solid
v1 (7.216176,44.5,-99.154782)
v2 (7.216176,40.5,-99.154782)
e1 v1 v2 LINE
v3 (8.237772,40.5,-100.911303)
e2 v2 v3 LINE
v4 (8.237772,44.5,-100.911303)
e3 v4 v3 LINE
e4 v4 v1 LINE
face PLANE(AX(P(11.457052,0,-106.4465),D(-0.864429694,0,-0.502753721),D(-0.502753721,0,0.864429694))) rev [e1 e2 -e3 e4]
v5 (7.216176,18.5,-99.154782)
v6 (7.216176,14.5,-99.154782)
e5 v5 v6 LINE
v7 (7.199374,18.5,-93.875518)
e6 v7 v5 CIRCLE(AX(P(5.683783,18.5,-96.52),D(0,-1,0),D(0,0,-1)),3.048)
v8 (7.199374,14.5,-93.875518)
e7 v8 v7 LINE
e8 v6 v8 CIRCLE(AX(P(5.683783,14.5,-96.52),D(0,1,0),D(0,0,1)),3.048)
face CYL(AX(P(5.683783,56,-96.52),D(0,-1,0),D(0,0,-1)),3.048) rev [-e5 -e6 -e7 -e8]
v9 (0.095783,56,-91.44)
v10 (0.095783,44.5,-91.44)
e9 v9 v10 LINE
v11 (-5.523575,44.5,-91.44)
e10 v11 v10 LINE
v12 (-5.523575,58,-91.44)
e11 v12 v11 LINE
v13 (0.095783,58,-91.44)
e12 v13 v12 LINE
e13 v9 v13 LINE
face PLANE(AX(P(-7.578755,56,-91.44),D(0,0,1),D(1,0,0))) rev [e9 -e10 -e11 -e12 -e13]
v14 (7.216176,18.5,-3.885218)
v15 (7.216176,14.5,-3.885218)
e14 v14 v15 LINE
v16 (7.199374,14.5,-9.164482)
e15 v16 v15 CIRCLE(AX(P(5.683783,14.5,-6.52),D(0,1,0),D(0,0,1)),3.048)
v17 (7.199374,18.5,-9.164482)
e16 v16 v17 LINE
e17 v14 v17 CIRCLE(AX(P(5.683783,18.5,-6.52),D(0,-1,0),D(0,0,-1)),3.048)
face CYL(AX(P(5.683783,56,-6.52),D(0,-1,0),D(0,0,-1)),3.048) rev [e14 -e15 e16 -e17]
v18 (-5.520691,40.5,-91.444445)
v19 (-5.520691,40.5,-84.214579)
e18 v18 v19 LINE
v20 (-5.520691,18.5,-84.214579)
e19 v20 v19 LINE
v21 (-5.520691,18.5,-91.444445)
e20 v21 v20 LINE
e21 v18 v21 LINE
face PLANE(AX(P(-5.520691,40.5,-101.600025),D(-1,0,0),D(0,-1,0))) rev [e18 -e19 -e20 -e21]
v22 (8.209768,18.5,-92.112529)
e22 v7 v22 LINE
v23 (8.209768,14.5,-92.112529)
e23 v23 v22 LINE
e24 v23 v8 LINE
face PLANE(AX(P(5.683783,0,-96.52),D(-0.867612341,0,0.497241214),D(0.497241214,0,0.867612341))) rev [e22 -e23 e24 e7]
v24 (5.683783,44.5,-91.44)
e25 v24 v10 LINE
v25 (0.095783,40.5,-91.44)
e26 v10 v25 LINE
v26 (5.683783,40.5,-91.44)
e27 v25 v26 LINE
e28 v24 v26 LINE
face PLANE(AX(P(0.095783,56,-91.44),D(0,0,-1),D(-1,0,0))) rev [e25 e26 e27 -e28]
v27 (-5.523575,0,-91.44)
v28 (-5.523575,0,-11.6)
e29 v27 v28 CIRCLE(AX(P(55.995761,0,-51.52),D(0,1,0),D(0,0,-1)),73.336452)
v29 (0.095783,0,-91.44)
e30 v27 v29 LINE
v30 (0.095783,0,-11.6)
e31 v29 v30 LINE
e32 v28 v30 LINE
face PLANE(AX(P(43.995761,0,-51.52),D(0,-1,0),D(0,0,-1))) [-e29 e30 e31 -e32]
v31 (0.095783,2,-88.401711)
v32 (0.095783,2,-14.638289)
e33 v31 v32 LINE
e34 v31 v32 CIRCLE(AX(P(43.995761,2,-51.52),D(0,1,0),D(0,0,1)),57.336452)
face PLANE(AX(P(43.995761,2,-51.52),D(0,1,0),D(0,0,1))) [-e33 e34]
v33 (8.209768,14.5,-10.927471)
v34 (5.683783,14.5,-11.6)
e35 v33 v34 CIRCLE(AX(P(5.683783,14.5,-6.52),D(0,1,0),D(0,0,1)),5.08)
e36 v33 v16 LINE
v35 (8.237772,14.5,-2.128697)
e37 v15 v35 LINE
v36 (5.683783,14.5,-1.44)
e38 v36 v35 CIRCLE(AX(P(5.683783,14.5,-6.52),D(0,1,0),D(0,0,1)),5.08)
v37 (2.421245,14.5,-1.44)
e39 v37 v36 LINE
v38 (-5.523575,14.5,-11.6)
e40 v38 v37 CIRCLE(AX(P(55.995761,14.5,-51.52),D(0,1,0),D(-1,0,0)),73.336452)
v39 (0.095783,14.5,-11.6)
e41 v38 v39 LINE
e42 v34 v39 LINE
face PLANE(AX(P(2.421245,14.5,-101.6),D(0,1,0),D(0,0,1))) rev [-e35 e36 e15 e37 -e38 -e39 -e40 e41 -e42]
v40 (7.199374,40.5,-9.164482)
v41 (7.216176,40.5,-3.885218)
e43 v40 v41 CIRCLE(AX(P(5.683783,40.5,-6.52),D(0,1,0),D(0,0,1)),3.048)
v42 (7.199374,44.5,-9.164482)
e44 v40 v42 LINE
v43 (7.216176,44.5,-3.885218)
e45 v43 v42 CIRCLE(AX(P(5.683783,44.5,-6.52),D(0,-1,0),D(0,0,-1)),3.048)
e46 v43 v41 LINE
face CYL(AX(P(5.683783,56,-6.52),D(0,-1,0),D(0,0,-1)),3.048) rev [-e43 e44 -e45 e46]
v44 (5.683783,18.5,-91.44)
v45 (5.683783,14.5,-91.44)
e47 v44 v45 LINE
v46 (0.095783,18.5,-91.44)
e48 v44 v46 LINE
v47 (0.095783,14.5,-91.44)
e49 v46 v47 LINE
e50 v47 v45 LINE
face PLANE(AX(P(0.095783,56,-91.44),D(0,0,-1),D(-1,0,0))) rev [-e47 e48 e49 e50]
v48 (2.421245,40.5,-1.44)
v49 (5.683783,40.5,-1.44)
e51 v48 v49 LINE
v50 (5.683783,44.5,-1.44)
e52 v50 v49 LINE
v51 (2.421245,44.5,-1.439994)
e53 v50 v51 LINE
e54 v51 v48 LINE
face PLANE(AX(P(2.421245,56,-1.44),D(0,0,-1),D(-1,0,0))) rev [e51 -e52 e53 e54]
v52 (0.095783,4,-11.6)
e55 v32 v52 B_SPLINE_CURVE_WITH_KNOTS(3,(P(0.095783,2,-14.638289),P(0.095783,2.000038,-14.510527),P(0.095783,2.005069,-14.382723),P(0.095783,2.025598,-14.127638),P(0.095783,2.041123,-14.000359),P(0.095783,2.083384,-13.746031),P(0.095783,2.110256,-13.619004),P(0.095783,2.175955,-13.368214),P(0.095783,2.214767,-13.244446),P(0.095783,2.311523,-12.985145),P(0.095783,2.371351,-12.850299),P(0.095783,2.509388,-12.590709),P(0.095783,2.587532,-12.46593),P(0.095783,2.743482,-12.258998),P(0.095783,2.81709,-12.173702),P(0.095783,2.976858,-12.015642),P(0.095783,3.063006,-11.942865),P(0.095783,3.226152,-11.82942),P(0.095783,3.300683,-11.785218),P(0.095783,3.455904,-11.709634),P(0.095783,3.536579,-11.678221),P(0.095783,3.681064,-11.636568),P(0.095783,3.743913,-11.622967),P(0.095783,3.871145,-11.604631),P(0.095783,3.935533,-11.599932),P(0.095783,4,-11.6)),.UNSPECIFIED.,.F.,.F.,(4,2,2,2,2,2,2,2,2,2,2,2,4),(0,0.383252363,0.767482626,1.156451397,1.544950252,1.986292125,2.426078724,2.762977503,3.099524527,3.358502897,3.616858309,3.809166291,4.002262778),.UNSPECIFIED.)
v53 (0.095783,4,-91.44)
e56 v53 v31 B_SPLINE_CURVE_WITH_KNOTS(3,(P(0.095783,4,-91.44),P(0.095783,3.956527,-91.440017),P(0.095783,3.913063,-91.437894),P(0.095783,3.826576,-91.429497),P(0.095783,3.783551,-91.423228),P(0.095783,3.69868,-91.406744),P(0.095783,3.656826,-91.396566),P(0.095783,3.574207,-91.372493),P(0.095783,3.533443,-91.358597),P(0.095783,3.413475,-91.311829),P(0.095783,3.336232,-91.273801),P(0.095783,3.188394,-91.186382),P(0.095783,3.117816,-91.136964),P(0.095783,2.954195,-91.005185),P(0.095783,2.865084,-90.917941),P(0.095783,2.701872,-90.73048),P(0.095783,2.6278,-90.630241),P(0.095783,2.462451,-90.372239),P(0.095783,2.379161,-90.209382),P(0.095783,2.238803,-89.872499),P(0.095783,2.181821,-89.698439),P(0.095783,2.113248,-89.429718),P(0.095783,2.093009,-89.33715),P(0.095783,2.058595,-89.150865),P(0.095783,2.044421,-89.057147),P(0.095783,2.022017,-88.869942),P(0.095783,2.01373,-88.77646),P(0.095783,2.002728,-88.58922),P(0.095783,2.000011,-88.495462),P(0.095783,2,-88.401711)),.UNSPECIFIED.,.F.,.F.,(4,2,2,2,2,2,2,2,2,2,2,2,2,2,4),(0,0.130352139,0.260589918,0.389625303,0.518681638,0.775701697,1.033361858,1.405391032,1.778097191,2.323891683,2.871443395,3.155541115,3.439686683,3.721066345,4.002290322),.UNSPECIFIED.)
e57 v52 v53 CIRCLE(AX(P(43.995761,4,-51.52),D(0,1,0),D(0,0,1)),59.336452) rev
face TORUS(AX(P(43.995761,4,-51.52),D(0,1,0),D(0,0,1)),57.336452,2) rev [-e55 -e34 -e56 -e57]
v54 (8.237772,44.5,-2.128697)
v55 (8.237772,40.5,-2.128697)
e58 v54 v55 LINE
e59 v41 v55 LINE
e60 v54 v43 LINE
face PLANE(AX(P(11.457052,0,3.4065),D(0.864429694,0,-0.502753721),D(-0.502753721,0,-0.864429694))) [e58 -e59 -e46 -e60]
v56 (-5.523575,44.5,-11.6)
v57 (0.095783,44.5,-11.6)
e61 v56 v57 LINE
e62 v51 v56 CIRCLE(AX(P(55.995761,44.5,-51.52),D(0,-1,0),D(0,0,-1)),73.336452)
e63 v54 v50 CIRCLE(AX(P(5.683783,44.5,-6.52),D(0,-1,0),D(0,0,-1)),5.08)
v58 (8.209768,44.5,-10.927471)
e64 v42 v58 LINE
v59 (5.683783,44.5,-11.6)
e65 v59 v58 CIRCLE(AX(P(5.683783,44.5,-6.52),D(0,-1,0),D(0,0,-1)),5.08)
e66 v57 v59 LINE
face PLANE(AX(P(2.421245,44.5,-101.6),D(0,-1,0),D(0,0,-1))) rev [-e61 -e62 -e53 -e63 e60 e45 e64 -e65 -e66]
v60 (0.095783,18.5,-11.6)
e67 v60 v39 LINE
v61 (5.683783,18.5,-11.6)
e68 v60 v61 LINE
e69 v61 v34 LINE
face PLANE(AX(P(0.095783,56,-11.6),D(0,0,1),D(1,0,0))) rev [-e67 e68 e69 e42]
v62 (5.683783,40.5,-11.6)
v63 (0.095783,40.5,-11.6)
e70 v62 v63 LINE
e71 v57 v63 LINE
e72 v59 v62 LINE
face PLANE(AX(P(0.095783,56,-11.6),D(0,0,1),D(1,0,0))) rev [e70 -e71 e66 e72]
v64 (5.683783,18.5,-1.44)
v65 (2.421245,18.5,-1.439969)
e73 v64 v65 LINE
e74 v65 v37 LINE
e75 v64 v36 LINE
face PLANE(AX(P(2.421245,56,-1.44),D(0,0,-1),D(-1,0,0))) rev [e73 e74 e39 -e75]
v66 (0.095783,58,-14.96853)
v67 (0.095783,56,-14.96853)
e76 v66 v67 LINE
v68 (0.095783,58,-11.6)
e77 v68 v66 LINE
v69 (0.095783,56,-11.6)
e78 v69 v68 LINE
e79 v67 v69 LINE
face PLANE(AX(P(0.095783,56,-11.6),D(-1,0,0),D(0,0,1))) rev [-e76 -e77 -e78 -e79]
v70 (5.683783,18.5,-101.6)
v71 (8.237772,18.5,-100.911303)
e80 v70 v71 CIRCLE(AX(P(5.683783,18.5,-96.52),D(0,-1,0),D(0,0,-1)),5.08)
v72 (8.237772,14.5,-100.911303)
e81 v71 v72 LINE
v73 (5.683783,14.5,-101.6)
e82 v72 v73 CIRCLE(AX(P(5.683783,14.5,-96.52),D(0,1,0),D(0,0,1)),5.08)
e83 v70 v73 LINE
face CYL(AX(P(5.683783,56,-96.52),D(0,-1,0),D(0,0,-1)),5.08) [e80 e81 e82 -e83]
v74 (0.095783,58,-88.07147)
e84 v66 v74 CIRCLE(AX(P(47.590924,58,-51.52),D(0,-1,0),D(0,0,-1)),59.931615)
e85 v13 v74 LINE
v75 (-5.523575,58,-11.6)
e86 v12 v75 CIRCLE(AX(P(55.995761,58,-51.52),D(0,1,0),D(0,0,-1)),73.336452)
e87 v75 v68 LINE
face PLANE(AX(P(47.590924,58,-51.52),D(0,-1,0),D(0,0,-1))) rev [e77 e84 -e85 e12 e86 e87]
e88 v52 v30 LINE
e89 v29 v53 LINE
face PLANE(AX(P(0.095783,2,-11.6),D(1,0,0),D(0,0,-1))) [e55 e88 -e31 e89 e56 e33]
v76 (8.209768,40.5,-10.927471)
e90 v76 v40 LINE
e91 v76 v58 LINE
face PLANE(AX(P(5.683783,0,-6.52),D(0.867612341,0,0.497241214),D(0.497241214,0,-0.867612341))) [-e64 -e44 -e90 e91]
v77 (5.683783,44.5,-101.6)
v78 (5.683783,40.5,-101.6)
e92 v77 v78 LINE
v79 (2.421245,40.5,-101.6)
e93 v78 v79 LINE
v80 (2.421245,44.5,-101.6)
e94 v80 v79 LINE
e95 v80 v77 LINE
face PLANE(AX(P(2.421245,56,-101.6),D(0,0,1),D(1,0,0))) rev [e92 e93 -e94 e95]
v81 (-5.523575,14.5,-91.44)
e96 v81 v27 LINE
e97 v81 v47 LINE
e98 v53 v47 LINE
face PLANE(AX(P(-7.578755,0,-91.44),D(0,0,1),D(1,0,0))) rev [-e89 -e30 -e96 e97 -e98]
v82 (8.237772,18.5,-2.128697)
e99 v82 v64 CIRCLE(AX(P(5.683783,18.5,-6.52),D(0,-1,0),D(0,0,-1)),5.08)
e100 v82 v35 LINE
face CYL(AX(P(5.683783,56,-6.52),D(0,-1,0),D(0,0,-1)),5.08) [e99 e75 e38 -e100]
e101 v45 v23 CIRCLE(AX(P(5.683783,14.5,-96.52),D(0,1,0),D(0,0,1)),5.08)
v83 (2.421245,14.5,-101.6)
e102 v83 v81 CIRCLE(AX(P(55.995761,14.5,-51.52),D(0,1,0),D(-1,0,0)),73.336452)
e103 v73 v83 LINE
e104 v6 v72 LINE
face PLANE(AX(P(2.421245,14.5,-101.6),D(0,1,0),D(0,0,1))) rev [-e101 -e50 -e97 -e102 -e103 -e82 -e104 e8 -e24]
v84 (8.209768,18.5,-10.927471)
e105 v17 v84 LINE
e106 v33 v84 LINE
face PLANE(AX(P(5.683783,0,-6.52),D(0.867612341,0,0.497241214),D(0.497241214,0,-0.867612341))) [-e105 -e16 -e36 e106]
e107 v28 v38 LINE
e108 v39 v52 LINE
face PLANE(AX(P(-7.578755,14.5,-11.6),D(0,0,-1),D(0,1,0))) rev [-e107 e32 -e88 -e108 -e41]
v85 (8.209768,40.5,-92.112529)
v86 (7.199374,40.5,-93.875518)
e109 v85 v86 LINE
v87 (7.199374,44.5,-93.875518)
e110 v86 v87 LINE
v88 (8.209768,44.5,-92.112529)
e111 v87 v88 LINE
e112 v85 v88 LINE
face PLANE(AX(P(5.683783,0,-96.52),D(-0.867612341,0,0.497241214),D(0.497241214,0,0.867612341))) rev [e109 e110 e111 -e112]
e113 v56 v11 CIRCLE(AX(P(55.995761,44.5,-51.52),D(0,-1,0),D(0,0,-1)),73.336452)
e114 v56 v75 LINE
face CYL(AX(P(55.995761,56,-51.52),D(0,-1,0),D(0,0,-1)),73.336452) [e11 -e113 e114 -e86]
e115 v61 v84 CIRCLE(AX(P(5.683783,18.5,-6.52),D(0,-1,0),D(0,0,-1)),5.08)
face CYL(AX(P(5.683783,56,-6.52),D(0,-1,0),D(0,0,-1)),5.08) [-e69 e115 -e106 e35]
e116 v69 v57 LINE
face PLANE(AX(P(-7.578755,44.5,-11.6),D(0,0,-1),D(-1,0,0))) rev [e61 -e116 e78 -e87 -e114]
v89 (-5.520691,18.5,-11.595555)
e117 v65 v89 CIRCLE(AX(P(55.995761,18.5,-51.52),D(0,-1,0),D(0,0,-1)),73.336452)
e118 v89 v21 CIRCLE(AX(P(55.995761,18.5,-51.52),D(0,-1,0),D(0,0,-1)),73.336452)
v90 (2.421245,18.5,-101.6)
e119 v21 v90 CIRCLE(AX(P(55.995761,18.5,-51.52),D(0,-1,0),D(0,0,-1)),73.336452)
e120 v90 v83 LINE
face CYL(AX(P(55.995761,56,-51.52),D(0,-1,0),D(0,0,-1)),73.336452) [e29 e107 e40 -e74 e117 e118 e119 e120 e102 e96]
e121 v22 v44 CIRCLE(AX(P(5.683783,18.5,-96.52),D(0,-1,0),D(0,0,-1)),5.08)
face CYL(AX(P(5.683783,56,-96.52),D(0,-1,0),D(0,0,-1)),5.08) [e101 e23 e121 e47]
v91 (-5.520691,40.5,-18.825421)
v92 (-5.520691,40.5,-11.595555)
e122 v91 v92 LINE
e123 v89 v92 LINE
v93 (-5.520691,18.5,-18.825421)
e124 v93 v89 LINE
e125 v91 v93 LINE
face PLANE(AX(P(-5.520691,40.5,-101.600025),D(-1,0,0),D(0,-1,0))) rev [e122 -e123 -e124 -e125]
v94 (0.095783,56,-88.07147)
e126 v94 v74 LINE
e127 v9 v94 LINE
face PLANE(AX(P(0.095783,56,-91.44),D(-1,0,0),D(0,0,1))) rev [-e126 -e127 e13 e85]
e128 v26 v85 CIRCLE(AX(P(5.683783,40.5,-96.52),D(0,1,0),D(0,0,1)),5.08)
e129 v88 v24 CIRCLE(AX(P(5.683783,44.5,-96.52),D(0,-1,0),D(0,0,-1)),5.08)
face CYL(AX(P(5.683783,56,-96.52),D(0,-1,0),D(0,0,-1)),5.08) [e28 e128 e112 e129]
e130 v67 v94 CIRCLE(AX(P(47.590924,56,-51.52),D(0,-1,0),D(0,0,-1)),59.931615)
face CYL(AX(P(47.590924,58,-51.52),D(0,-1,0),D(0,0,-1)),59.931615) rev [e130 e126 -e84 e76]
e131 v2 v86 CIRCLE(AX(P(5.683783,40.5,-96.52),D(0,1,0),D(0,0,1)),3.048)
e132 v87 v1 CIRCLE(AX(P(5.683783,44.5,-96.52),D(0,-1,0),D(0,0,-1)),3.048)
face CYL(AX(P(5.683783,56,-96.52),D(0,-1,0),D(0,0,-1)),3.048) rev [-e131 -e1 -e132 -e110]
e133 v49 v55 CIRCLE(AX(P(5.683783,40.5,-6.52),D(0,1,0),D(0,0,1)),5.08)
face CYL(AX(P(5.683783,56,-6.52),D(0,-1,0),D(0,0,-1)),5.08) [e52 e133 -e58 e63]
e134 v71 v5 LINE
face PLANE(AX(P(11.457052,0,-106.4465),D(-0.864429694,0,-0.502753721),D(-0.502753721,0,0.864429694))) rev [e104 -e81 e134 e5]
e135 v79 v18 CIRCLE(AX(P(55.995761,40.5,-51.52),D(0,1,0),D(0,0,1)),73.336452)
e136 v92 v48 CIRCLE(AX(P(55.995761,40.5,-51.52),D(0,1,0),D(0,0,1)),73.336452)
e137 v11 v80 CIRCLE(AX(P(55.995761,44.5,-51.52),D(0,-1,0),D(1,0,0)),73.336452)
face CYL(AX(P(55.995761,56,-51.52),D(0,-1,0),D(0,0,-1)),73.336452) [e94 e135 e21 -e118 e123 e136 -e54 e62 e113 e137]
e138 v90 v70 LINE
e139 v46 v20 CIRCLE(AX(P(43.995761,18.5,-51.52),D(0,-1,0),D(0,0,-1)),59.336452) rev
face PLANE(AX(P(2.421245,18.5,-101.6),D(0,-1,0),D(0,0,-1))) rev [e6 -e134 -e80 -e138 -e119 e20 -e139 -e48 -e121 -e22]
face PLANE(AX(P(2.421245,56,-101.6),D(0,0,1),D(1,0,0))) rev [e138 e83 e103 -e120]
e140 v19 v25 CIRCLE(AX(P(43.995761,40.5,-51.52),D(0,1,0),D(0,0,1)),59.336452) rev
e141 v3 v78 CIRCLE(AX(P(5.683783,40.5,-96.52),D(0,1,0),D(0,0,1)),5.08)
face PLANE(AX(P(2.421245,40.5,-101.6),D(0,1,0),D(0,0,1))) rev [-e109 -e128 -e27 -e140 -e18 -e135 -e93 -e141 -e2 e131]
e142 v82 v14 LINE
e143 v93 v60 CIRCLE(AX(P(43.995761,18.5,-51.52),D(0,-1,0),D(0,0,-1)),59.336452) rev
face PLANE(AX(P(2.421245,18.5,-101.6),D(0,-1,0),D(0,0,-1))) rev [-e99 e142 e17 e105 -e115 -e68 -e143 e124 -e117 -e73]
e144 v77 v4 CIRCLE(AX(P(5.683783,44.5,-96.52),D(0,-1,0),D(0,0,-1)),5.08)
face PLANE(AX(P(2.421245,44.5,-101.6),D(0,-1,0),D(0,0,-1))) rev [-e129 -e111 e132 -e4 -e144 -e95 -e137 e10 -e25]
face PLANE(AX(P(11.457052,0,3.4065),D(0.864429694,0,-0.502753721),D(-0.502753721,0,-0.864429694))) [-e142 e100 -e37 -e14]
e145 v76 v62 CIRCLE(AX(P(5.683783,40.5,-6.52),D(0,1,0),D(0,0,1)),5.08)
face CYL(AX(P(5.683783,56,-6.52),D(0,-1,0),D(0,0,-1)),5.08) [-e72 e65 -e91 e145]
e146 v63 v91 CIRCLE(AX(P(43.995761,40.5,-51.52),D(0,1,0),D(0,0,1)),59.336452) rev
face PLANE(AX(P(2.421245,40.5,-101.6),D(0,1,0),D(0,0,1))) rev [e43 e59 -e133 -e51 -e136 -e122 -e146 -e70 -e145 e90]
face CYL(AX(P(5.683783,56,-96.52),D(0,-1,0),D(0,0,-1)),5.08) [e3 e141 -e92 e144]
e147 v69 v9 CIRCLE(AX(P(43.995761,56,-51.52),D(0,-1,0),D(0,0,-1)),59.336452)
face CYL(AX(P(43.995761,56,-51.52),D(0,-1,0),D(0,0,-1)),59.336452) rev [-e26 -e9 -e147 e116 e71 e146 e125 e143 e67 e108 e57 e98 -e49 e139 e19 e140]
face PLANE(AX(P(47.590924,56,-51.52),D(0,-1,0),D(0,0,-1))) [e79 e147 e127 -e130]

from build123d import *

# Parameters (mm, degrees)
SKETCH2_R               = 3.048
BOSS_EXTRUDE1_DEPTH     = 56
CUT_EXTRUDE2_DEPTH      = 118.2998702
CUT_EXTRUDE3_DEPTH      = 117.054836818
CUT_EXTRUDE3_DEPTH_BACK = 117.054836818
SKETCH12_W              = 5.816526385
SKETCH12_H              = 22
SKETCH12_H_2            = 11.5
SKETCH12_H_3            = 14.5
SKETCH13_W              = 10.16
SKETCH13_H              = 11.5
SKETCH13_H_2            = 14.5
CUT_EXTRUDE4_DEPTH      = 10
FILLET1_R               = 10
BOSS_EXTRUDE2_DEPTH     = 2
FILLET2_R               = 2
BOSS_EXTRUDE3_DEPTH     = 2
SKETCH18_W              = 2.878327065
SKETCH18_H              = 3.541775271
SKETCH18_W_2            = 3.166541323
SKETCH18_H_2            = 3.584686202
CUT_EXTRUDE5_DEPTH      = 2
CUT_EXTRUDE7_DEPTH      = 109.465199714
CUT_EXTRUDE7_DEPTH_BACK = 109.465199714
SKETCH19_W              = 7.941935835
SKETCH19_H              = 22


with BuildPart() as part:
    # Sketch2 → Boss-Extrude1 (new body)
    with BuildSketch(Plane(origin=(0, 0, 0), x_dir=(1, 0, 0), z_dir=(0, 1, 0))):
        with BuildLine():
            Line((0.095782763, 91.44), (5.683782763, 91.44))
            ThreePointArc((5.683782763, 91.44), (10.763782763, 96.52), (5.683782763, 101.6))
            Line((5.683782763, 101.6), (2.421245281, 101.6))
            ThreePointArc((2.421245281, 101.6), (-17.340690554, 51.52), (2.421245281, 1.44))
            Line((2.421245281, 1.44), (5.683782763, 1.44))
            ThreePointArc((5.683782763, 1.44), (10.763782763, 6.52), (5.683782763, 11.6))
            Line((5.683782763, 11.6), (0.095782763, 11.6))
            ThreePointArc((0.095782763, 11.6), (-15.340690554, 51.52), (0.095782763, 91.44))
        make_face()
        with Locations(Location((5.683782763, 96.52, 0), (0, 0, 270))):
            Circle(SKETCH2_R, mode=Mode.SUBTRACT)
        with Locations(Location((5.683782763, 6.52, 0), (0, 0, 90))):
            Circle(SKETCH2_R, mode=Mode.SUBTRACT)
    extrude(amount=BOSS_EXTRUDE1_DEPTH)

    # Sketch6 → Cut-Extrude2 (cut, symmetric)
    with BuildSketch(Plane(origin=(0, 56, 0), x_dir=(1, 0, 0), z_dir=(0, 1, 0))):
        Polygon((5.683782763, 6.52), (11.45705153, 16.593499718), (11.45705153, -3.406500282), align=None)
    cut_extrude2 = extrude(amount=CUT_EXTRUDE2_DEPTH, both=True, mode=Mode.SUBTRACT)

    # Mirror1: Cut-Extrude2 across plane
    add(cut_extrude2.mirror(Plane.XY.offset(-51.52)), mode=Mode.SUBTRACT)

    # Sketch12 → Cut-Extrude3 (cut, two sides: drawn at the far end of the back side and taken through both)
    with BuildSketch(Plane.XY.offset(-1.44).offset(-CUT_EXTRUDE3_DEPTH_BACK)):
        with Locations((5.329508474, 29.5)):
            Rectangle(SKETCH12_W, SKETCH12_H)
        with Locations((5.329508474, 50.25)):
            Rectangle(SKETCH12_W, SKETCH12_H_2)
        with Locations((5.329508474, 7.25)):
            Rectangle(SKETCH12_W, SKETCH12_H_3)
    extrude(amount=CUT_EXTRUDE3_DEPTH + CUT_EXTRUDE3_DEPTH_BACK, mode=Mode.SUBTRACT)

    # Sketch13 → Cut-Extrude4 (cut)
    with BuildSketch(Plane(origin=(2.421245281, 0, 0), x_dir=(0, 0, -1), z_dir=(1, 0, 0))):
        with Locations((6.52, 50.25)):
            Rectangle(SKETCH13_W, SKETCH13_H)
        with Locations((6.52, 7.25)):
            Rectangle(SKETCH13_W, SKETCH13_H_2)
        with Locations((96.52, 50.25)):
            Rectangle(SKETCH13_W, SKETCH13_H)
        with Locations((96.52, 7.25)):
            Rectangle(SKETCH13_W, SKETCH13_H_2)
    extrude(amount=-CUT_EXTRUDE4_DEPTH, mode=Mode.SUBTRACT)

    # Fillet1
    # the kernel refuses this fillet: 10 mm, written as the material it takes off along each edge
    with BuildSketch(Plane(origin=(2.421245281, 18.5, -91.44), x_dir=(0, 0, -1), z_dir=(0, 1, 0)), Plane(origin=(2.421245281, 40.5, -11.6), x_dir=(0, 0, 1), z_dir=(0, -1, 0))) as fillet1_piece_1:
        with BuildLine():
            CenterArc((6.411043164, 10), FILLET1_R, 230.125785038, 39.874214962)
            Line((0, 2.325462519), (0, 0))
            Line((0, 0), (6.411043164, 0))
        make_face()
    extrude(amount=22, mode=Mode.SUBTRACT)

    # Sketch15 → Boss-Extrude2 (add)
    with BuildSketch(Plane(origin=(0, 0, 0), x_dir=(-1, 0, 0), z_dir=(0, -1, 0))):
        with BuildLine():
            Line((-0.095782763, 11.6), (-0.095782763, 91.44))
            ThreePointArc((-0.095782763, 91.44), (15.340690554, 51.52), (-0.095782763, 11.6))
        make_face()
    extrude(amount=-BOSS_EXTRUDE2_DEPTH)

    # Fillet2
    fillet2_edges = [part.edges().sort_by_distance(p)[0] for p in [
        (-15.340690554, 2, -51.52),
    ]]
    fillet(fillet2_edges, radius=FILLET2_R)

    # Sketch17 → Boss-Extrude3 (add)
    with BuildSketch(Plane(origin=(0, 56, 0), x_dir=(1, 0, 0), z_dir=(0, 1, 0))):
        with BuildLine():
            Line((2.889782763, 91.44), (-5.523575239, 91.44))
            ThreePointArc((-5.523575239, 91.44), (-17.340690554, 51.52), (-5.523575239, 11.6))
            Line((-5.523575239, 11.6), (2.889782763, 11.6))
            ThreePointArc((2.889782763, 11.6), (-12.340690554, 51.52), (2.889782763, 91.44))
        make_face()
    extrude(amount=BOSS_EXTRUDE3_DEPTH)

    # Sketch18 → Cut-Extrude5 (cut)
    with BuildSketch(Plane(origin=(0, 58, 0), x_dir=(1, 0, 0), z_dir=(0, 1, 0))):
        with Locations((1.534946295, 13.370887636)):
            Rectangle(SKETCH18_W, SKETCH18_H)
        with Locations((1.679053424, 89.647656899)):
            Rectangle(SKETCH18_W_2, SKETCH18_H_2)
    extrude(amount=-CUT_EXTRUDE5_DEPTH, mode=Mode.SUBTRACT)

    # Sketch19 → Cut-Extrude7 (cut, two sides: drawn at the far end of the back side and taken through both)
    with BuildSketch(Plane.XY.offset(-11.6).offset(-CUT_EXTRUDE7_DEPTH_BACK)):
        with Locations((-1.549722637, 29.5)):
            Rectangle(SKETCH19_W, SKETCH19_H)
    extrude(amount=CUT_EXTRUDE7_DEPTH + CUT_EXTRUDE7_DEPTH_BACK, mode=Mode.SUBTRACT)


solid = part.part
